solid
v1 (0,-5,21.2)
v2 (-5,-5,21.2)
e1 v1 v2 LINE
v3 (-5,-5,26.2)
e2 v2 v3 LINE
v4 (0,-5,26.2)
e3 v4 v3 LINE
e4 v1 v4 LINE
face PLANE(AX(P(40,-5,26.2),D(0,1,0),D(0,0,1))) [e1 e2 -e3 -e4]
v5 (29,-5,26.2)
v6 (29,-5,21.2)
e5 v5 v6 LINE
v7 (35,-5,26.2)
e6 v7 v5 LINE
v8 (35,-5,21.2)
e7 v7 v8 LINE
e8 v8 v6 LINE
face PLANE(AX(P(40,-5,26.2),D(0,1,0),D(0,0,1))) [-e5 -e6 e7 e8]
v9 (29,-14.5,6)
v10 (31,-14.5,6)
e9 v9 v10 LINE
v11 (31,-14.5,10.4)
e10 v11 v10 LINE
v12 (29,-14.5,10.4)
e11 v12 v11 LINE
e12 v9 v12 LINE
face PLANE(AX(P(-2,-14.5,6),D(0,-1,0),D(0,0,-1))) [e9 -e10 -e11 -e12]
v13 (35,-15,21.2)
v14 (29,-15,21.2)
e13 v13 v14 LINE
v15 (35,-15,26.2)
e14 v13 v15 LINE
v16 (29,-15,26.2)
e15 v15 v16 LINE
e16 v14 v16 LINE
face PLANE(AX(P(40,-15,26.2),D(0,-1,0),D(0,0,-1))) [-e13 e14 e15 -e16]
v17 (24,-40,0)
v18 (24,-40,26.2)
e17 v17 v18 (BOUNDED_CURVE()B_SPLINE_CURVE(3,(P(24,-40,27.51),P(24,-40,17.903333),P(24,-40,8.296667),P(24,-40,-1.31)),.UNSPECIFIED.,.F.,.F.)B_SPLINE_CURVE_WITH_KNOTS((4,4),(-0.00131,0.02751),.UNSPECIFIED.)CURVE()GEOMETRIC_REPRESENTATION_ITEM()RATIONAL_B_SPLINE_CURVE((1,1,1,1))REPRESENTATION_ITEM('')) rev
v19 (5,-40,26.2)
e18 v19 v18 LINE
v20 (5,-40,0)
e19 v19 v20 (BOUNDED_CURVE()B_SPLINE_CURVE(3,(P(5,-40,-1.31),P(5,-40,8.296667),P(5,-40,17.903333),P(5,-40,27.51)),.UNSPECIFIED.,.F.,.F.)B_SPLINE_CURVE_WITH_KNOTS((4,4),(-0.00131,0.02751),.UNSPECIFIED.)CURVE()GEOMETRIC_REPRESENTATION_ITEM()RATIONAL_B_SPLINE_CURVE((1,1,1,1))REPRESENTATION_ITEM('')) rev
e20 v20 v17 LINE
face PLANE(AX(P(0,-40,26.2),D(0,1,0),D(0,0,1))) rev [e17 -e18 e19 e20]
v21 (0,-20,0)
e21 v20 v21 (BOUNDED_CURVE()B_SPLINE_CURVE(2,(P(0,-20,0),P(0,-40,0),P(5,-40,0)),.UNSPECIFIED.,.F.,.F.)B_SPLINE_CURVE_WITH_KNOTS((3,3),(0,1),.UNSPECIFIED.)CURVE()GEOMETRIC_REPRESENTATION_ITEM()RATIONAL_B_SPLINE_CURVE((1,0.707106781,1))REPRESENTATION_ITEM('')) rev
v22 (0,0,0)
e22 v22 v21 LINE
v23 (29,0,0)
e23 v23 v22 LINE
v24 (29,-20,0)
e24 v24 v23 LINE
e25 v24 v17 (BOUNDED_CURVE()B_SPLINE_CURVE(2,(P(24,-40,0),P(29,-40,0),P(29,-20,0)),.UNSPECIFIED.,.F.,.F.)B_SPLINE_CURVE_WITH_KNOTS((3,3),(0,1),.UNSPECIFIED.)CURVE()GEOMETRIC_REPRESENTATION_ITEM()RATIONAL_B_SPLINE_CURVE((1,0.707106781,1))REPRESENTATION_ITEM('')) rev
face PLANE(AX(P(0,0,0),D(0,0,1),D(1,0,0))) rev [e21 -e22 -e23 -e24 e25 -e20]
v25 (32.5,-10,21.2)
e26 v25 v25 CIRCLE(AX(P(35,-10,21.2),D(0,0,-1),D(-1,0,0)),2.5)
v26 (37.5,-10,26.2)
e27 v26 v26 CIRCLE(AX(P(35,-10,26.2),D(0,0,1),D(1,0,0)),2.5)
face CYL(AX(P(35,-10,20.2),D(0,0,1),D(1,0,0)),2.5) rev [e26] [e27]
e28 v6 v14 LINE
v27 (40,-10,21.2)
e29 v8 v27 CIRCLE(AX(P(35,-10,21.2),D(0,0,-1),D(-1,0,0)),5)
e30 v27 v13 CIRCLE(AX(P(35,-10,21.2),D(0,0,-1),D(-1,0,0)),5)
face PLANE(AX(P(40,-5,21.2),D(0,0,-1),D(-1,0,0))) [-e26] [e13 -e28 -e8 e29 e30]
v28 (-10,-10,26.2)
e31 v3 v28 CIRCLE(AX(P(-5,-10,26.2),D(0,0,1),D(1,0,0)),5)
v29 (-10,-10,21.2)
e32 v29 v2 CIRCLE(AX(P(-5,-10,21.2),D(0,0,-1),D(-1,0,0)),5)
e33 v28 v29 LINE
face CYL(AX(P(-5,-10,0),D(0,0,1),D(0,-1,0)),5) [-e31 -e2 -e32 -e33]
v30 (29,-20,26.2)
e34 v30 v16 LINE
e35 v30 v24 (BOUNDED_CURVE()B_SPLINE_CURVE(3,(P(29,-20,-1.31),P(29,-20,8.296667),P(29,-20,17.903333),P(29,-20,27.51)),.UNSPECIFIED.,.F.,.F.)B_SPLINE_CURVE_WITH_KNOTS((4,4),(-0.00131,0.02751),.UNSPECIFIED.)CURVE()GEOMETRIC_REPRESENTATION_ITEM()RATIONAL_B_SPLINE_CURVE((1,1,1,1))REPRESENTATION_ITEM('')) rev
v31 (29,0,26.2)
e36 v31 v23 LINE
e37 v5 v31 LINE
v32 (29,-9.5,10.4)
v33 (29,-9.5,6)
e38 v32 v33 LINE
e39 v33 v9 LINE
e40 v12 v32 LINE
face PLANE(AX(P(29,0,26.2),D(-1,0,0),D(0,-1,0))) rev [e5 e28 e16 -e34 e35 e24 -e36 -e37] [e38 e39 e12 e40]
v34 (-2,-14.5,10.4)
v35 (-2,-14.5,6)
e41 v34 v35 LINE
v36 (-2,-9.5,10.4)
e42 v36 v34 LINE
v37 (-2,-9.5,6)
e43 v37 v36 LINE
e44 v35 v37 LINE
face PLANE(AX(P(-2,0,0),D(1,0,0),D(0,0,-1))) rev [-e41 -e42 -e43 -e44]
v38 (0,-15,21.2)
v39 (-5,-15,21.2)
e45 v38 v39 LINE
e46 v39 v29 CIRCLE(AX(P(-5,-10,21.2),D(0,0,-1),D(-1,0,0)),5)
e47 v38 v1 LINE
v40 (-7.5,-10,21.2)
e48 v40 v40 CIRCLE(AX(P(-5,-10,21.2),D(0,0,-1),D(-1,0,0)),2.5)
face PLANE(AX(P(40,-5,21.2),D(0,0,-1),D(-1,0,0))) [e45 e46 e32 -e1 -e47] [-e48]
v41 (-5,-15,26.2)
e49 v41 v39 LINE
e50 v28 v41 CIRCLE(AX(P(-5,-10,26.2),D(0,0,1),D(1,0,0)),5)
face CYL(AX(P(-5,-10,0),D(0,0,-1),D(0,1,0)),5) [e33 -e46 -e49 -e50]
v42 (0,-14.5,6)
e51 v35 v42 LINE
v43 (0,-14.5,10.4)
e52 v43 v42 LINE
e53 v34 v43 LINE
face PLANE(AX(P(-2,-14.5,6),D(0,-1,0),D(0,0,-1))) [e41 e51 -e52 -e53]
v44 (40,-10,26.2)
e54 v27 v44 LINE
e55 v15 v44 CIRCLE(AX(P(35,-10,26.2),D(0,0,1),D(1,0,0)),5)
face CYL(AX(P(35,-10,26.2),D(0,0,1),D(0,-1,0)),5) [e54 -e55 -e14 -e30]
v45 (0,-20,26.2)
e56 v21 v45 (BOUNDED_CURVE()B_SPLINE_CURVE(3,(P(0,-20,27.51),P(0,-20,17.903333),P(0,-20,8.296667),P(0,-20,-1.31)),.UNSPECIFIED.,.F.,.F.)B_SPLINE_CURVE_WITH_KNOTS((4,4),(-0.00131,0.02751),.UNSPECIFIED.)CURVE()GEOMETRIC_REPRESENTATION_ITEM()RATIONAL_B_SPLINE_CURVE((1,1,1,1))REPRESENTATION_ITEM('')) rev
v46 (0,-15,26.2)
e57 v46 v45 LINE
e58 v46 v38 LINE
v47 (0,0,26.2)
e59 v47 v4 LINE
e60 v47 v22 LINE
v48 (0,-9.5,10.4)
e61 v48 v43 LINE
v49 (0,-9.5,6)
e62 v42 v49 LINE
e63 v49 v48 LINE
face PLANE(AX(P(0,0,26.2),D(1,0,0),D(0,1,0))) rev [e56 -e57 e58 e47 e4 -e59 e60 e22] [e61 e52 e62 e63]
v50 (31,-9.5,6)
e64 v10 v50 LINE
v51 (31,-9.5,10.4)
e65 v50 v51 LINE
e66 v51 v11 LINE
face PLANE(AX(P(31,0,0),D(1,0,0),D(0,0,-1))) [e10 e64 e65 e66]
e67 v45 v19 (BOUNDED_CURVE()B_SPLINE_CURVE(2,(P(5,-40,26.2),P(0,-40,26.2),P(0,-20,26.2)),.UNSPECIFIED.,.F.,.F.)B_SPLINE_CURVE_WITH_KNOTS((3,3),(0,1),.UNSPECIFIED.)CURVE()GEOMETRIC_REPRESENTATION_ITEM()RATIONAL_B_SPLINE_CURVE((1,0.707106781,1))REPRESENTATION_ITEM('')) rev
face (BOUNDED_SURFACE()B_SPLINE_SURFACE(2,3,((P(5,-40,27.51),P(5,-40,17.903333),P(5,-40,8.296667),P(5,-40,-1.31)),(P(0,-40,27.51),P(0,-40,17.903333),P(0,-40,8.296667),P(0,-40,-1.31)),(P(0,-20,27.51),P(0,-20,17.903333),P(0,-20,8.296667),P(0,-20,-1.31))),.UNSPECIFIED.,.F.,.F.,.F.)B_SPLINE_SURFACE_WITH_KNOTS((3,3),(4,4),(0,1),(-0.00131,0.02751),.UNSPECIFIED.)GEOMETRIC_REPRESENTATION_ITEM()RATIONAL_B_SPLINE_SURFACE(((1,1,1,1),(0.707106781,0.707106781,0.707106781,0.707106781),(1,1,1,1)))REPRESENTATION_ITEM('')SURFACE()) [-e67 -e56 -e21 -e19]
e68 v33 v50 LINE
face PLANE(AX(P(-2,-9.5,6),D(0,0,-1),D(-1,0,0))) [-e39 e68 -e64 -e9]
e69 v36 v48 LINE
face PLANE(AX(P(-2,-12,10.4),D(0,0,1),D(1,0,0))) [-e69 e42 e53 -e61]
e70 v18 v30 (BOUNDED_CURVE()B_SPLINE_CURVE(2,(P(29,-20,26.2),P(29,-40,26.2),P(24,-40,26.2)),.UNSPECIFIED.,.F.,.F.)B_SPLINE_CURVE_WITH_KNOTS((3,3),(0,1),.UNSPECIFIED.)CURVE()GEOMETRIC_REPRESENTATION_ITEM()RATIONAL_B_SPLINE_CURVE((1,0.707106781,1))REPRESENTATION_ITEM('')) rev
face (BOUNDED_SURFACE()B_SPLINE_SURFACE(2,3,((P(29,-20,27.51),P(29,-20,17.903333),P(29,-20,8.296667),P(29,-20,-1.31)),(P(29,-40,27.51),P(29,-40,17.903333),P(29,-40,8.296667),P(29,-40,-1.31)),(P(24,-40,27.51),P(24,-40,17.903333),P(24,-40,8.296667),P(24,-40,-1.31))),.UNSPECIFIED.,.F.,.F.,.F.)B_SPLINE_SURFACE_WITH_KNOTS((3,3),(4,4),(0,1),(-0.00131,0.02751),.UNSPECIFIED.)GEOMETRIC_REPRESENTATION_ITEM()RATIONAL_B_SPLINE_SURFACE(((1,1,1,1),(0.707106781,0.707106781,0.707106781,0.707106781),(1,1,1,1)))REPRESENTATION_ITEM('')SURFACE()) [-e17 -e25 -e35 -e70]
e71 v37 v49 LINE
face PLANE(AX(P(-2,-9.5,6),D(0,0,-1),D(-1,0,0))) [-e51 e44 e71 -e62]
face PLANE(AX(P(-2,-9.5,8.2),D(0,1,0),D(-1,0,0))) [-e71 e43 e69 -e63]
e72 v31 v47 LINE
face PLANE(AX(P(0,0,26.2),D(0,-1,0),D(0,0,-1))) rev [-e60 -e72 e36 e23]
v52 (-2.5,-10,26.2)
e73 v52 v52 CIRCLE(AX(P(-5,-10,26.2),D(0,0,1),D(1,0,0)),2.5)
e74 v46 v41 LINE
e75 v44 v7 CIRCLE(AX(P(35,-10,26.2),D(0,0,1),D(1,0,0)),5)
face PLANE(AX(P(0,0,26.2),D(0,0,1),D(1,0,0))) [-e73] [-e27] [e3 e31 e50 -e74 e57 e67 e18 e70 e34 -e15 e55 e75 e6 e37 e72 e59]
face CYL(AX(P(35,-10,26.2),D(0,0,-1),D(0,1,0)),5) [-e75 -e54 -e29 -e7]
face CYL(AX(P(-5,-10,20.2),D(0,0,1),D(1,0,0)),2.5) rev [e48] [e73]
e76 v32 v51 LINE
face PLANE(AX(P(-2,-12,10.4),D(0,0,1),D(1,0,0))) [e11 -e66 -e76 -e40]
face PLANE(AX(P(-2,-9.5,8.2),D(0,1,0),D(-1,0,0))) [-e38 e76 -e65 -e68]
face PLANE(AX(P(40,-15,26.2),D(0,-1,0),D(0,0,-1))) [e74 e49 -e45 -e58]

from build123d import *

# Parameters (mm, degrees)
SKETCH1_W                = 29
SKETCH1_H                = 40
BOSS_EXTRUDE1_DEPTH      = 26.2
FILLET1_SIZE             = 20
FILLET1_SIZE_2           = 5
BOSS_EXTRUDE2_DEPTH      = 10
BOSS_EXTRUDE2_DEPTH_BACK = 40
SKETCH5_W                = 5
SKETCH5_H                = 10
FILLET2_R                = 5
SKETCH6_R                = 2.5
CUT_EXTRUDE2_DEPTH       = 6
BOSS_EXTRUDE3_DEPTH      = 2
BOSS_EXTRUDE3_DEPTH_BACK = 31


# Some blends are built 0.0001 mm under size
with BuildPart() as part:
    # Sketch1 → Boss-Extrude1 (new body)
    with BuildSketch(Plane.XY):
        with Locations((14.5, -20)):
            Rectangle(SKETCH1_W, SKETCH1_H)
    extrude(amount=BOSS_EXTRUDE1_DEPTH)

    # Fillet1
    # an asymmetric fillet: 20, 5 mm, written as the material it takes off along each edge
    with BuildSketch(Plane(origin=(29, -40, -50), x_dir=(0, 1, 0), z_dir=(0, 0, 1))) as fillet1_piece_1:
        with BuildLine():
            Bezier((FILLET1_SIZE, 0), (0, 0), (0, FILLET1_SIZE_2), weights=[1, 0.707106781, 1])
            Line((0, FILLET1_SIZE_2), (0, 0))
            Line((0, 0), (FILLET1_SIZE, 0))
        make_face()
    extrude(amount=126.2, mode=Mode.SUBTRACT)
    with BuildSketch(Plane(origin=(0, -40, -50), x_dir=(1, 0, 0), z_dir=(0, 0, 1))) as fillet1_piece_2:
        with BuildLine():
            Bezier((FILLET1_SIZE_2, 0), (0, 0), (0, FILLET1_SIZE), weights=[1, 0.707106781, 1])
            Line((0, FILLET1_SIZE), (0, 0))
            Line((0, 0), (FILLET1_SIZE_2, 0))
        make_face()
    extrude(amount=126.2, mode=Mode.SUBTRACT)

    # Sketch5 → Boss-Extrude2 (add, two sides: drawn at the far end of the back side and taken through both)
    with BuildSketch(Plane.ZY.offset(-BOSS_EXTRUDE2_DEPTH_BACK)):
        with Locations((23.7, -10)):
            Rectangle(SKETCH5_W, SKETCH5_H)
    extrude(amount=BOSS_EXTRUDE2_DEPTH + BOSS_EXTRUDE2_DEPTH_BACK)

    # Fillet2
    fillet2_edges = [part.edges().sort_by_distance(p)[0] for p in [
        (40, -15, 23.7),
        (40, -5, 23.7),
        (-10, -15, 23.7),
        (-10, -5, 23.7),
    ]]
    fillet(fillet2_edges, radius=FILLET2_R - 0.0001)  # a hair under: the kernel refuses the full size

    # Sketch6 → Cut-Extrude2 (cut)
    with BuildSketch(Plane.XY.offset(26.2)):
        with Locations((-5, -10)):
            Circle(SKETCH6_R)
        with Locations((35, -10)):
            Circle(SKETCH6_R)
    extrude(amount=-CUT_EXTRUDE2_DEPTH, mode=Mode.SUBTRACT)

    # Sketch7 → Boss-Extrude3 (add, two sides: drawn at the far end of the back side and taken through both)
    with BuildSketch(Plane(origin=(29, 0, 0), x_dir=(0, 0, -1), z_dir=(1, 0, 0)).offset(-BOSS_EXTRUDE3_DEPTH_BACK)):
        Polygon((-8.2, -9.5), (-6, -9.5), (-6, -12), (-6, -14.5), (-8.2, -14.5), (-10.4, -14.5), (-10.4, -12), (-10.4, -9.5), align=None)
    extrude(amount=BOSS_EXTRUDE3_DEPTH + BOSS_EXTRUDE3_DEPTH_BACK)


solid = part.part
